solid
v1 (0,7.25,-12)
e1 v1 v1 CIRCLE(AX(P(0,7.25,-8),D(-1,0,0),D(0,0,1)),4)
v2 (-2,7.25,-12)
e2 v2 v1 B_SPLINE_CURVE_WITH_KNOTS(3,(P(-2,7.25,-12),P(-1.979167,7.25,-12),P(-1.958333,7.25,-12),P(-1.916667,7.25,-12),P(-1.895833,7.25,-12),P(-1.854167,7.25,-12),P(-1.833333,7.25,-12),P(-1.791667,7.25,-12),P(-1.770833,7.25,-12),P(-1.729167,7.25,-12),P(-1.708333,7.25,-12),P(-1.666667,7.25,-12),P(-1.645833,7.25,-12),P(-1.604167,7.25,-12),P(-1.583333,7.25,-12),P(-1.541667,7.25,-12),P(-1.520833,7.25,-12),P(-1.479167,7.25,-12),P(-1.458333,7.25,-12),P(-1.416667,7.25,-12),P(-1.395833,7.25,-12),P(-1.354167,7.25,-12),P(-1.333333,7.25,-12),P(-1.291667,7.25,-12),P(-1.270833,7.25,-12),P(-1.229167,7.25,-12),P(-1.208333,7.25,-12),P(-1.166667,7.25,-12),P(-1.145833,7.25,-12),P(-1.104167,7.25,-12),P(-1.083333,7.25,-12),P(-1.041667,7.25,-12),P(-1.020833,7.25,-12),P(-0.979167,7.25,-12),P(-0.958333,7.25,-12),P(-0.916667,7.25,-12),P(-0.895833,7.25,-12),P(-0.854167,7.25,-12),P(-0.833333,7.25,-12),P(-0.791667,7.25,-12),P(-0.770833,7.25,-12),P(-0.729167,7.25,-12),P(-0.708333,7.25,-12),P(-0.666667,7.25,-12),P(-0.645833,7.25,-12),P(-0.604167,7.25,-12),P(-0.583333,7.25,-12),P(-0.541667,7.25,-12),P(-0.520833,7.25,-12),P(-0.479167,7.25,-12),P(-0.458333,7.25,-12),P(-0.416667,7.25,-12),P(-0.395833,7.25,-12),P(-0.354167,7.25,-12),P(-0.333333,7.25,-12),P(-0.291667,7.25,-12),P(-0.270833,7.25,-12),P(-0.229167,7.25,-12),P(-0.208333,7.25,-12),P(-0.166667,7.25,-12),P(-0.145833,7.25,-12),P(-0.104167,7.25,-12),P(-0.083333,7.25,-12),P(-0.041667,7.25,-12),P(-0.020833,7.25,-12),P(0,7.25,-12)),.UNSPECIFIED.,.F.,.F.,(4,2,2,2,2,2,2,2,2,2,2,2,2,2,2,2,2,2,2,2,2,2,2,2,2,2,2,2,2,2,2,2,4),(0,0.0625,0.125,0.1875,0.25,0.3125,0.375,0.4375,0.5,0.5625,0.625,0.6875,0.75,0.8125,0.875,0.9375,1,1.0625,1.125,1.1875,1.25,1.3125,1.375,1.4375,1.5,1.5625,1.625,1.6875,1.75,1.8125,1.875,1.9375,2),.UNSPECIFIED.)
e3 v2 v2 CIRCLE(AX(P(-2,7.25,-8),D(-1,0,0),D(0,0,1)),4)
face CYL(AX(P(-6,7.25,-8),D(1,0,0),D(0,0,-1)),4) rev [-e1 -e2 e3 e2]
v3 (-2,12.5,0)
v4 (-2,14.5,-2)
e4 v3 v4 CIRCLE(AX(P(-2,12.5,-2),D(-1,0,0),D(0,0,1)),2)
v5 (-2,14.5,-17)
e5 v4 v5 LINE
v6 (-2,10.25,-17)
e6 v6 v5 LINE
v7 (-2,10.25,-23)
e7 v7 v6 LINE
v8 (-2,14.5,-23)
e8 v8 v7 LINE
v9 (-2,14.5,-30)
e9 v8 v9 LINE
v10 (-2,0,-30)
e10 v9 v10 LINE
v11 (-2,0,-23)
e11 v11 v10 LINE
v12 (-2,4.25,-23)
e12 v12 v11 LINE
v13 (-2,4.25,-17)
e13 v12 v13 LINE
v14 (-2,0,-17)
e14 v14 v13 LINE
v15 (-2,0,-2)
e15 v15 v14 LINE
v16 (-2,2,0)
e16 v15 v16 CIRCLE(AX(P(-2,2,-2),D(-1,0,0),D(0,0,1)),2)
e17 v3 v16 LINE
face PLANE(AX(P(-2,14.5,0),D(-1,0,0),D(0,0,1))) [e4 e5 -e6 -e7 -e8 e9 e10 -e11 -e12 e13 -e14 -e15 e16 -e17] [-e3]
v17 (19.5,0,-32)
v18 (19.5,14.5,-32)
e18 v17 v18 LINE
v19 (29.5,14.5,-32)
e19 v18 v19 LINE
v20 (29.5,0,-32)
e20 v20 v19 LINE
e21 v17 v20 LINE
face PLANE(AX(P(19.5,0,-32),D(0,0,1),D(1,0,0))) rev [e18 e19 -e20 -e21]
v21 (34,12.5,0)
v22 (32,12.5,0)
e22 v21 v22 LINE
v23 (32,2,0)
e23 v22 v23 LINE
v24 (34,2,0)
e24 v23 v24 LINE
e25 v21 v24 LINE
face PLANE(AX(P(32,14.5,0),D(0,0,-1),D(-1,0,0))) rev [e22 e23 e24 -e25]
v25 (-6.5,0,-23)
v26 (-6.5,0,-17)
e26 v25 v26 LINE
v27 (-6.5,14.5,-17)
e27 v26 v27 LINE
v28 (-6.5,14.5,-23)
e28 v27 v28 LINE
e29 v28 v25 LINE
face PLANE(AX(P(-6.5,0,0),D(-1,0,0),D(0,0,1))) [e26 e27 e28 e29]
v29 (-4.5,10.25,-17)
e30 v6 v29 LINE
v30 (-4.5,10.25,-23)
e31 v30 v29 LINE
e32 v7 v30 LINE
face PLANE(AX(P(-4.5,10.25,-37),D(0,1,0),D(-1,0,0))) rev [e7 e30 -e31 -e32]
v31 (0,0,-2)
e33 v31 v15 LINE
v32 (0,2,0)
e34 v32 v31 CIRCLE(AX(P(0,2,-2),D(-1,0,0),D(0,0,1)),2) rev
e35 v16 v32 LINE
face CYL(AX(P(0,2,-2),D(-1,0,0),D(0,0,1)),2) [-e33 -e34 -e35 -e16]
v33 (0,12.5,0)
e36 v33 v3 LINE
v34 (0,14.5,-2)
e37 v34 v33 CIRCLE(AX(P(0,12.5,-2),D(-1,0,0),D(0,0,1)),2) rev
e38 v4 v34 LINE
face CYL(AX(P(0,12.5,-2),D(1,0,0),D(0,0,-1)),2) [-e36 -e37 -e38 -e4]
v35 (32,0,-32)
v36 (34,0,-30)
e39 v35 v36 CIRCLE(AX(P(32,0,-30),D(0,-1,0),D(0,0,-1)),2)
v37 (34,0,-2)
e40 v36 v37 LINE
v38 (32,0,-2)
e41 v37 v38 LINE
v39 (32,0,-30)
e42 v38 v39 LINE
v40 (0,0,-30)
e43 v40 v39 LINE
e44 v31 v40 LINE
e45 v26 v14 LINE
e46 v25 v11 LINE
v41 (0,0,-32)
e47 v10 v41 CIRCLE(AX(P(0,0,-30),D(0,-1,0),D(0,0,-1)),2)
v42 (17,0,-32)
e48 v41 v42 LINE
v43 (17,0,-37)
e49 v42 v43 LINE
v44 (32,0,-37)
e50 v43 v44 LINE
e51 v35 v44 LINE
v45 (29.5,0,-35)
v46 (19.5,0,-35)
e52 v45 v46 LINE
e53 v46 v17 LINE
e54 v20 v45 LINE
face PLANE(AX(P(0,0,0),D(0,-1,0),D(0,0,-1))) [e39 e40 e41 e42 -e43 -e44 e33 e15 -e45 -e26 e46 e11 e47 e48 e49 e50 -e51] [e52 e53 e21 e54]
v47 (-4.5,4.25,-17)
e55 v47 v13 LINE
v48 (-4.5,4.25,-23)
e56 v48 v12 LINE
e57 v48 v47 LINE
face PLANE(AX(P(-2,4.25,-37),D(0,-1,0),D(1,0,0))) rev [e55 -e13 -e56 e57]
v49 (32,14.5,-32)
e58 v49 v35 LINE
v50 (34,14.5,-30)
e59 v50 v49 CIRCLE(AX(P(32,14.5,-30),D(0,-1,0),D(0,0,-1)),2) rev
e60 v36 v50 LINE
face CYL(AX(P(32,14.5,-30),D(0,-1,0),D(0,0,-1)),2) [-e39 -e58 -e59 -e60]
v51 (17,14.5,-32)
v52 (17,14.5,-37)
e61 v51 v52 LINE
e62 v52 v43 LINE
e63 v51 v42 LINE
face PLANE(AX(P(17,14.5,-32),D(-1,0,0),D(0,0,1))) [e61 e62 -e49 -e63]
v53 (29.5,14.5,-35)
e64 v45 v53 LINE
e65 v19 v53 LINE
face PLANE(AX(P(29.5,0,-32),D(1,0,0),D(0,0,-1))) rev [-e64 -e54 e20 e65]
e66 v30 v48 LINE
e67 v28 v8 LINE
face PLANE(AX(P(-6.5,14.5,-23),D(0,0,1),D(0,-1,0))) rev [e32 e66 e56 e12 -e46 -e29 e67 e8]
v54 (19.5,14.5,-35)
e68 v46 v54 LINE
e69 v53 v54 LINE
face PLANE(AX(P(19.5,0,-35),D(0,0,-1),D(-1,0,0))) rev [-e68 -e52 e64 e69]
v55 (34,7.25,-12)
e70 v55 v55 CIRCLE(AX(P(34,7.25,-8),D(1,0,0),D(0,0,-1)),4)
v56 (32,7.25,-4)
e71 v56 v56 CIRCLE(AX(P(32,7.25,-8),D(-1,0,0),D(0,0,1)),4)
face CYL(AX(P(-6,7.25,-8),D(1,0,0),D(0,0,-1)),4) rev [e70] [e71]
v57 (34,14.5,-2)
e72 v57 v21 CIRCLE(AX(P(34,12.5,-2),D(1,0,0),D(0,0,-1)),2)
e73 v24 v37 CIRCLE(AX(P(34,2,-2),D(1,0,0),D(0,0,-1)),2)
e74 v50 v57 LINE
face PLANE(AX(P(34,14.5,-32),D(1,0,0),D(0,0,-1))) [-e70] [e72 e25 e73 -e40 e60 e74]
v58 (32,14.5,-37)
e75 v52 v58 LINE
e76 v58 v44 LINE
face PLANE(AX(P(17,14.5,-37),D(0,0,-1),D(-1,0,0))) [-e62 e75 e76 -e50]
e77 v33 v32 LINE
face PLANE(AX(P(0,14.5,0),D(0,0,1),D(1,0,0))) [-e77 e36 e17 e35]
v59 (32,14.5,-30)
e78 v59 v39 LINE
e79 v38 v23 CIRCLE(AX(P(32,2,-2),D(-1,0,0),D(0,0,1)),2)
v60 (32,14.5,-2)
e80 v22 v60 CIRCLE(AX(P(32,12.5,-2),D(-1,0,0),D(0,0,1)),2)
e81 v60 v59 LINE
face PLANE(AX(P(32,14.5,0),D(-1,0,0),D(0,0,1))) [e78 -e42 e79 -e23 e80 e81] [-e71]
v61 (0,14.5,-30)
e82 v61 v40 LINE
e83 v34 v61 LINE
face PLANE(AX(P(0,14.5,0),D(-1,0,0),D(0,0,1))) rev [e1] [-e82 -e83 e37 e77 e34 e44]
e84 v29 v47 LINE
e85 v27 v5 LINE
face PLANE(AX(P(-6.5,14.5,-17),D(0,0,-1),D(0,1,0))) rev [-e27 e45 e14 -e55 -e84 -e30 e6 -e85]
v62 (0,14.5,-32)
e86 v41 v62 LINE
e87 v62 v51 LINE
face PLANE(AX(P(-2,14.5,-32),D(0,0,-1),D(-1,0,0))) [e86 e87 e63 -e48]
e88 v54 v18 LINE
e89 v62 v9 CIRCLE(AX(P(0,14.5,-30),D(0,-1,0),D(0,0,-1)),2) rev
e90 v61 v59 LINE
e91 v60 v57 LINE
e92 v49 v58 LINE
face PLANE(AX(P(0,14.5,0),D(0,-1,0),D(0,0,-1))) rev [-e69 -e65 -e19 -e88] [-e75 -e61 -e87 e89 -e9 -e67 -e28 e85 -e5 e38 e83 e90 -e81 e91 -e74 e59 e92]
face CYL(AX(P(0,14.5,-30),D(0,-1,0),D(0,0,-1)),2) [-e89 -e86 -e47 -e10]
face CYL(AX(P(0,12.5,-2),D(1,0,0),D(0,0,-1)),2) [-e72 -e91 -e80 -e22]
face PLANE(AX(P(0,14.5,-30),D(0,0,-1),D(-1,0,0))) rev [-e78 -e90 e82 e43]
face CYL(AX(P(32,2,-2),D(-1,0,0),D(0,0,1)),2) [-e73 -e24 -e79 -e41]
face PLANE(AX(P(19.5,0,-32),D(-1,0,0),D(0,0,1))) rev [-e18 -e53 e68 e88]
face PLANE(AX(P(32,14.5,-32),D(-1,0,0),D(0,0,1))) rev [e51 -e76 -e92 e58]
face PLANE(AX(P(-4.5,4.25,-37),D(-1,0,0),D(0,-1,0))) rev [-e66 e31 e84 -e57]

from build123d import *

# Parameters (mm, degrees)
EXTRUDE_1_DEPTH     = 14.5
SKETCH_2_W          = 10
SKETCH_2_H          = 3
CUT_EXTRUDE_1_DEPTH = 53.299617589
SKETCH_3_R          = 4
CUT_EXTRUDE_3_DEPTH = 40
FILLET_1_R          = 2
FILLET_2_R          = 2
FILLET_3_R          = 2
FILLET_4_R          = 2
FILLET_5_R          = 2
FILLET_6_R          = 2
SKETCH_5_W          = 6
SKETCH_5_H          = 14.5
EXTRUDE_2_DEPTH     = 4.5
SKETCH_6_W          = 2.5
SKETCH_6_H          = 6
CUT_EXTRUDE_4_DEPTH = 43.026777178


with BuildPart() as part:
    # Эскиз1 → Бобышка-Вытянуть1 (new body)
    with BuildSketch(Plane(origin=(0, 0, 0), x_dir=(1, 0, 0), z_dir=(0, 1, 0))):
        Polygon((0, 0), (-2, 0), (-2, 32), (17, 32), (17, 37), (32, 37), (32, 32), (34, 32), (34, 0), (32, 0), (32, 30), (0, 30), align=None)
    extrude(amount=EXTRUDE_1_DEPTH)

    # Эскиз2 → Вырез-Вытянуть1 (cut, through all)
    with BuildSketch(Plane(origin=(0, 14.5, 0), x_dir=(1, 0, 0), z_dir=(0, 1, 0))):
        with Locations((24.5, 33.5)):
            Rectangle(SKETCH_2_W, SKETCH_2_H)
    extrude(amount=-CUT_EXTRUDE_1_DEPTH, mode=Mode.SUBTRACT)

    # Эскиз3 → Вырез-Вытянуть3 (cut)
    with BuildSketch(Plane(origin=(34, 0, 0), x_dir=(0, 0, -1), z_dir=(1, 0, 0))):
        with Locations((8, 7.25)):
            Circle(SKETCH_3_R)
    extrude(amount=-CUT_EXTRUDE_3_DEPTH, mode=Mode.SUBTRACT)

    # Скругление1
    fillet_1_edges = [part.edges().sort_by_distance(p)[0] for p in [
        (34, 7.25, -32),
    ]]
    fillet(fillet_1_edges, radius=FILLET_1_R - 0.0001)  # a hair under: the kernel refuses the full size

    # Скругление2
    fillet_2_edges = [part.edges().sort_by_distance(p)[0] for p in [
        (-2, 7.25, -32),
    ]]
    fillet(fillet_2_edges, radius=FILLET_2_R)

    # Скругление3
    fillet_3_edges = [part.edges().sort_by_distance(p)[0] for p in [
        (-1, 14.5, 0),
    ]]
    fillet(fillet_3_edges, radius=FILLET_3_R)

    # Скругление4
    fillet_4_edges = [part.edges().sort_by_distance(p)[0] for p in [
        (33, 14.5, 0),
    ]]
    fillet(fillet_4_edges, radius=FILLET_4_R)

    # Скругление5
    fillet_5_edges = [part.edges().sort_by_distance(p)[0] for p in [
        (33, 0, 0),
    ]]
    fillet(fillet_5_edges, radius=FILLET_5_R)

    # Скругление6
    fillet_6_edges = [part.edges().sort_by_distance(p)[0] for p in [
        (-1, 0, 0),
    ]]
    fillet(fillet_6_edges, radius=FILLET_6_R)

    # Эскиз5 → Бобышка-Вытянуть2 (add)
    with BuildSketch(Plane.ZY.offset(2)):
        with Locations((-20, 7.25)):
            Rectangle(SKETCH_5_W, SKETCH_5_H)
    extrude(amount=EXTRUDE_2_DEPTH)

    # Эскиз6 → Вырез-Вытянуть4 (cut, through all)
    with BuildSketch(Plane.XY.offset(-17)):
        with Locations((-3.25, 7.25)):
            Rectangle(SKETCH_6_W, SKETCH_6_H)
    extrude(amount=-CUT_EXTRUDE_4_DEPTH, mode=Mode.SUBTRACT)


solid = part.part
